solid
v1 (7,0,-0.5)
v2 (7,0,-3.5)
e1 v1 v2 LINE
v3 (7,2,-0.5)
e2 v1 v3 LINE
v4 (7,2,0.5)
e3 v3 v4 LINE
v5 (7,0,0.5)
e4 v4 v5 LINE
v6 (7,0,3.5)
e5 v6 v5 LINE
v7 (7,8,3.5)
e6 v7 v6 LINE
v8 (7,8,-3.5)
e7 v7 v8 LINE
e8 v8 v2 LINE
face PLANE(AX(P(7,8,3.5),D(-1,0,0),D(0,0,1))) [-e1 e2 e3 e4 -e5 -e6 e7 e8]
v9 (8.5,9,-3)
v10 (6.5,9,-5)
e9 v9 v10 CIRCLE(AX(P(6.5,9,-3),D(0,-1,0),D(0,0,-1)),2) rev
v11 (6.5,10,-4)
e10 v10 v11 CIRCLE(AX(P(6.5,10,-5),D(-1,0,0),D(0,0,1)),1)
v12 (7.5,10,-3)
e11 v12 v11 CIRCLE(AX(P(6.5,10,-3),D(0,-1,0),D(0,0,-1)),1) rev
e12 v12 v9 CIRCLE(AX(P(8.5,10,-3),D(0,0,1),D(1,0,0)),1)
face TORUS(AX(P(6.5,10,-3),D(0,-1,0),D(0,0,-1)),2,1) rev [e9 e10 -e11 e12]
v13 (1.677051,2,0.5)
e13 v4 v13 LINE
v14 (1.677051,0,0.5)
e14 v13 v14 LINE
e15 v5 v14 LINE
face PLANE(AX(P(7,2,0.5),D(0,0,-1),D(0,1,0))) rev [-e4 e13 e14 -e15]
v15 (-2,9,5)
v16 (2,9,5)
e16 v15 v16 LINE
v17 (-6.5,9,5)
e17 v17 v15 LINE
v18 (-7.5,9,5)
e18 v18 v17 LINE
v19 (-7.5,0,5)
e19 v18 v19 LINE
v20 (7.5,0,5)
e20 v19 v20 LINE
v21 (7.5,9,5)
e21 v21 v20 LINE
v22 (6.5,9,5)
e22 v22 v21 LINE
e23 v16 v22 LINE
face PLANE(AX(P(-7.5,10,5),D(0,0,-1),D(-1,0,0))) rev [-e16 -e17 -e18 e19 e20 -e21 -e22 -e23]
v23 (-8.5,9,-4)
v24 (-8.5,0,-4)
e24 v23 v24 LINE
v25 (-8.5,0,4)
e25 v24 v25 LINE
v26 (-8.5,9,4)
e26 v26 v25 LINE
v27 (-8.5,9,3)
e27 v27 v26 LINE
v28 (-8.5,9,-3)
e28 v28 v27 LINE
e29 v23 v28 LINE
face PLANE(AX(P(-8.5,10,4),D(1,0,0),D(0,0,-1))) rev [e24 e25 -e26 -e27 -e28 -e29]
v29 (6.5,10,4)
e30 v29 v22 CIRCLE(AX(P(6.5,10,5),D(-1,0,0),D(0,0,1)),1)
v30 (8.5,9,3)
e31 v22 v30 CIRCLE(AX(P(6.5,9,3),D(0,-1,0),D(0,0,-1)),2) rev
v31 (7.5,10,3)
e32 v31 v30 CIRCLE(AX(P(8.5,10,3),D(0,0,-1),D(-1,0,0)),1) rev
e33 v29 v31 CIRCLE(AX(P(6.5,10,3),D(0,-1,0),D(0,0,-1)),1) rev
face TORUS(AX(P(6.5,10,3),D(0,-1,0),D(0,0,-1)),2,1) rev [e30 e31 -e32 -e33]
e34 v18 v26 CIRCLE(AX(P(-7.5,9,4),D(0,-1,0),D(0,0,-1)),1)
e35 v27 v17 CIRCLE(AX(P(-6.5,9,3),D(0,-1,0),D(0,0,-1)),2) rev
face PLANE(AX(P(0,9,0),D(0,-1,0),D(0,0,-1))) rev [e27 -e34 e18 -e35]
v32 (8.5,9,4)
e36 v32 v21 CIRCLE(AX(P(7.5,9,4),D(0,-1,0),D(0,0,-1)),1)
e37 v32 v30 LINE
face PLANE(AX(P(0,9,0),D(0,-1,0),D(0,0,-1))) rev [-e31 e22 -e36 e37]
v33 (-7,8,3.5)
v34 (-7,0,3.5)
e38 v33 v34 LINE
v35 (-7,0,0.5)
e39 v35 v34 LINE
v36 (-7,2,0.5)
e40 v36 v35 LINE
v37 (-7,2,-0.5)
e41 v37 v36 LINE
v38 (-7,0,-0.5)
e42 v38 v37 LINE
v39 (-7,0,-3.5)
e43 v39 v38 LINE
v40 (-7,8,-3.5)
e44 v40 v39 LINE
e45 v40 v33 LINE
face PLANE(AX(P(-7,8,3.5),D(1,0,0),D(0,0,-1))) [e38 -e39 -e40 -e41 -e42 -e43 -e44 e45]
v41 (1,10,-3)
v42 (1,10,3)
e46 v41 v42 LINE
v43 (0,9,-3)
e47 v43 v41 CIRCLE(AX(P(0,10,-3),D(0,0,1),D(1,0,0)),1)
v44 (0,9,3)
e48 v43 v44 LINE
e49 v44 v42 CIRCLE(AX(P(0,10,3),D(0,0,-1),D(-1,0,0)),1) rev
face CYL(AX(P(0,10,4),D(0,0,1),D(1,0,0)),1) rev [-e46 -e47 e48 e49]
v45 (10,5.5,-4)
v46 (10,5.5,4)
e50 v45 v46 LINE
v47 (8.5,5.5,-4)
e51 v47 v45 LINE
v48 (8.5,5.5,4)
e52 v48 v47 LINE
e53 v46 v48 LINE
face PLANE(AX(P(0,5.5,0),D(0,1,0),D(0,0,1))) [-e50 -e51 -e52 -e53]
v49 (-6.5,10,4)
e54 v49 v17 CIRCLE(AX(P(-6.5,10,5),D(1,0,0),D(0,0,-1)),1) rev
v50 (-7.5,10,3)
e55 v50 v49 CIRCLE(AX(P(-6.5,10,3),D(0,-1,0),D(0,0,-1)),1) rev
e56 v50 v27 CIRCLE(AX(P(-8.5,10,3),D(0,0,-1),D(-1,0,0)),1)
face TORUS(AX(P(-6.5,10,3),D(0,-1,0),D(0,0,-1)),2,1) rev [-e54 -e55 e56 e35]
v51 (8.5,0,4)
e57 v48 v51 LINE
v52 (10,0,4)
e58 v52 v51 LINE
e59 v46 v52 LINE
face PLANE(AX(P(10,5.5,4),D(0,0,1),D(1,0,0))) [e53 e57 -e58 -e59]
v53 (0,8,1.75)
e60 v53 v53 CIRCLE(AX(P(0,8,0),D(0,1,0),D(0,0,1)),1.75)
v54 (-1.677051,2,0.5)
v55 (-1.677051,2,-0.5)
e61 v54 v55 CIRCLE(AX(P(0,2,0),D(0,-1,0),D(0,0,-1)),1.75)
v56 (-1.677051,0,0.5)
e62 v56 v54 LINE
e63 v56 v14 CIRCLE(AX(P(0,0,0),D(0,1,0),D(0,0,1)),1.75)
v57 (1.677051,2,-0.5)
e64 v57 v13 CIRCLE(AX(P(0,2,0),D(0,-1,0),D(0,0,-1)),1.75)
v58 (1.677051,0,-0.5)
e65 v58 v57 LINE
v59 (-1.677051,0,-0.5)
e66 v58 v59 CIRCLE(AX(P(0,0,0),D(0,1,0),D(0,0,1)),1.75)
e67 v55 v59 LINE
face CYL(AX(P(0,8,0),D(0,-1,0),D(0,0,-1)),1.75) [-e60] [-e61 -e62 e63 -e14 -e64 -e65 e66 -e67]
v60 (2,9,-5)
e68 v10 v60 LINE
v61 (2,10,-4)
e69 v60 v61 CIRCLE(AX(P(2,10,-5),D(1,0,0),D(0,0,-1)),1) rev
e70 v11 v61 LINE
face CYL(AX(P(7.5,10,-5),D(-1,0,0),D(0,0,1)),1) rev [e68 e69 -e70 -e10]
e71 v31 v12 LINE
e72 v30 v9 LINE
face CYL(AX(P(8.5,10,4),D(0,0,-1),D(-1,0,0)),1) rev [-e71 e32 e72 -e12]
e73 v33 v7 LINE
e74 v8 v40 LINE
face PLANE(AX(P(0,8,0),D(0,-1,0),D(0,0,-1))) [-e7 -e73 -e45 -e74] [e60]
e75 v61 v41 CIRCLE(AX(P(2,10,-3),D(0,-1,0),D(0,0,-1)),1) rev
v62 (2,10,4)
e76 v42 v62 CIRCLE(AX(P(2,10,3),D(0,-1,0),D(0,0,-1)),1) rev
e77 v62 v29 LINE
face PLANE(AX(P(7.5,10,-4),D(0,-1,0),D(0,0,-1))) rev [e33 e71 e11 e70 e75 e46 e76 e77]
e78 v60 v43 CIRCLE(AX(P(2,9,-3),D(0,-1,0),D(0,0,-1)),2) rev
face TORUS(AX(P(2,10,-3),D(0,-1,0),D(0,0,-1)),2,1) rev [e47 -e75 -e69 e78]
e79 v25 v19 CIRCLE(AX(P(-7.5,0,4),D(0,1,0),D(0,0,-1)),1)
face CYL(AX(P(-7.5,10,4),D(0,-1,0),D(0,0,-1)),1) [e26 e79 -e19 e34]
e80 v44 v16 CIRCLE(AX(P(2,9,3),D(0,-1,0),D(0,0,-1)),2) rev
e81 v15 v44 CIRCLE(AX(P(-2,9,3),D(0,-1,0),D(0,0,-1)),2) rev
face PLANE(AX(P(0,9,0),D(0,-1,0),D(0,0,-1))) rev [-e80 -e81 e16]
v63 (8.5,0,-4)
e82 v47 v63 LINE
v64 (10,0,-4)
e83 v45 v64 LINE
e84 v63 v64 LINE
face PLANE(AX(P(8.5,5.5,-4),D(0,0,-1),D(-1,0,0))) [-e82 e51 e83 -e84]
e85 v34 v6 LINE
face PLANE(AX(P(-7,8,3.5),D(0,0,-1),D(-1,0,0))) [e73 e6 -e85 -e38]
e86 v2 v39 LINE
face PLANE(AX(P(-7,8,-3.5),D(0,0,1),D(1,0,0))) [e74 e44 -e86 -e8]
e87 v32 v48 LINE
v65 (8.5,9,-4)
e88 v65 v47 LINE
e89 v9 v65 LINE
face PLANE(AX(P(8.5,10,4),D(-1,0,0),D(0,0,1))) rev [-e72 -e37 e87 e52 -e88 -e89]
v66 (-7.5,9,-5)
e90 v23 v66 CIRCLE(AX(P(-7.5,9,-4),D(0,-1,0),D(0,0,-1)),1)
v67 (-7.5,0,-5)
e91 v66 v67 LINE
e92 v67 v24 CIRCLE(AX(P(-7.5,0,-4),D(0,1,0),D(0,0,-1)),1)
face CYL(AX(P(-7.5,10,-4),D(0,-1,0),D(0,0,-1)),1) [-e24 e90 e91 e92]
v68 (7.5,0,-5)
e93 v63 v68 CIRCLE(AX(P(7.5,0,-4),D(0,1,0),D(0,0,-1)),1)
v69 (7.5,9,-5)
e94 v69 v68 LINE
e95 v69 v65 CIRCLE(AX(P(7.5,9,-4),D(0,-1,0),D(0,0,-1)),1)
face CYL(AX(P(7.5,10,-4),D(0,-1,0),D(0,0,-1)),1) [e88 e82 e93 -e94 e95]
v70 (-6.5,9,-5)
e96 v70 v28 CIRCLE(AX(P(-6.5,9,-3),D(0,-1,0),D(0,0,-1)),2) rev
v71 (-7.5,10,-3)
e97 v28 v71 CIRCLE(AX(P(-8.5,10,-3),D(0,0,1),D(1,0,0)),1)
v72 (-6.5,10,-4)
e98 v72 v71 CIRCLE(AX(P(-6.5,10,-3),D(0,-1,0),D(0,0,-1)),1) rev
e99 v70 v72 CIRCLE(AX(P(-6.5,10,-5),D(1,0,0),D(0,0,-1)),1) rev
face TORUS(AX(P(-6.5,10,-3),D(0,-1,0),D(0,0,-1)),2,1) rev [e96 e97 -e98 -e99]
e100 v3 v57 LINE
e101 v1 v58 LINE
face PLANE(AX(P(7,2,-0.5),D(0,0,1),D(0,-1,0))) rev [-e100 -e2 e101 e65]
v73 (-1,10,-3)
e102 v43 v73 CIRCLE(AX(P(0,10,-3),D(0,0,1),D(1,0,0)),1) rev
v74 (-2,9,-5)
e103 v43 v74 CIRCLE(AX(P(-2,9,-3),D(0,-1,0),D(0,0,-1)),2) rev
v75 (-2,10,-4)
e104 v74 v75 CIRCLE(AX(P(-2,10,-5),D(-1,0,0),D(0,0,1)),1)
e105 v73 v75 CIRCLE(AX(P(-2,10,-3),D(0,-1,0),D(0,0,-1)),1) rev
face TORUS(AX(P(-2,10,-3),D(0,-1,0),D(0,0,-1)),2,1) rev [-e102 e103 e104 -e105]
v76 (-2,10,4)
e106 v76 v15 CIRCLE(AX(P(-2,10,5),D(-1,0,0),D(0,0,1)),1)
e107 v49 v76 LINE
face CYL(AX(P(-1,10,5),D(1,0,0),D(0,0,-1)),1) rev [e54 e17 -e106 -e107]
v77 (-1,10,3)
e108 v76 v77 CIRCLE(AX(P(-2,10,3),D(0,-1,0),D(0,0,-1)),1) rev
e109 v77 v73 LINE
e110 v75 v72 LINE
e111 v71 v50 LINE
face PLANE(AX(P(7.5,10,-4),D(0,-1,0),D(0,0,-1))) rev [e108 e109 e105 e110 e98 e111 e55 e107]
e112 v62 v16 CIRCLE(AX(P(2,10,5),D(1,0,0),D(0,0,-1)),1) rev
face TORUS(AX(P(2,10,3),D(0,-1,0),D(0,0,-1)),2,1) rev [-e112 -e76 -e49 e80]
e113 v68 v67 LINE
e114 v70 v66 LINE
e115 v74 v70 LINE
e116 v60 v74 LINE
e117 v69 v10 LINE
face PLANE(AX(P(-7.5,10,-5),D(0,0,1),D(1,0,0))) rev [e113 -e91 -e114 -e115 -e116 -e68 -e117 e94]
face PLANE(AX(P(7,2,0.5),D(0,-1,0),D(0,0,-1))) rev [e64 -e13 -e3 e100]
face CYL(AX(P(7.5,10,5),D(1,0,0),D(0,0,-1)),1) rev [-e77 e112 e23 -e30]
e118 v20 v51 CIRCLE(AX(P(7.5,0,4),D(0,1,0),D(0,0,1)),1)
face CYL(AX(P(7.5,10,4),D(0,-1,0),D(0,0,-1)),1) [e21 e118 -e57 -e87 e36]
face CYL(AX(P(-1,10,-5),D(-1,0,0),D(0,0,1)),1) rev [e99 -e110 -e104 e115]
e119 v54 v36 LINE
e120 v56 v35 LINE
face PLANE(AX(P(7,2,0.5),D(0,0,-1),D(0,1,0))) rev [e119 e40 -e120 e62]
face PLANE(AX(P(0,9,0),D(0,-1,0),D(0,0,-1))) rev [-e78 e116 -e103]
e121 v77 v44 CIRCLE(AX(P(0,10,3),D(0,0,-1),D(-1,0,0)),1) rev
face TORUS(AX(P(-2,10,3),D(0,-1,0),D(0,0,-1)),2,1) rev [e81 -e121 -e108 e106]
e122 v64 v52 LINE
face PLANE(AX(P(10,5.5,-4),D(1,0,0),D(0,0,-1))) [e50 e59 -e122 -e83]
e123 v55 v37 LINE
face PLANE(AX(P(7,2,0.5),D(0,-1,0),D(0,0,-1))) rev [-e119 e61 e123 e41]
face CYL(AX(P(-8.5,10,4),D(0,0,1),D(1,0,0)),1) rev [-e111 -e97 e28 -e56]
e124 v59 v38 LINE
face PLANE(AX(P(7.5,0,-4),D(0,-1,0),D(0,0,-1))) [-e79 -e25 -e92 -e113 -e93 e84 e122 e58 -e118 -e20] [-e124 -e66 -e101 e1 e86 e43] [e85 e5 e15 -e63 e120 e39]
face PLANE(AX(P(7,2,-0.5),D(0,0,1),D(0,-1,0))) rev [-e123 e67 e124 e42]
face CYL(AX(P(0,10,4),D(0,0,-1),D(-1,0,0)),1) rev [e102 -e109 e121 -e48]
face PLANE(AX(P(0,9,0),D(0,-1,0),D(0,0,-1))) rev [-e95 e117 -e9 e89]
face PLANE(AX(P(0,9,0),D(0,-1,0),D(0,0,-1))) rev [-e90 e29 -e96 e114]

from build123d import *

# Parameters (mm, degrees)
BOSS_EXTRUDE1_DEPTH = 10
SKETCH2_W           = 14
SKETCH2_H           = 7
SKETCH2_R           = 1.75
CUT_EXTRUDE1_DEPTH  = 8
SKETCH3_W           = 1
SKETCH3_H           = 2
BOSS_EXTRUDE2_DEPTH = 14
SKETCH4_W           = 1.5
SKETCH4_H           = 8
BOSS_EXTRUDE3_DEPTH = 5.5
SKETCH5_W           = 17
SKETCH5_H           = 10
SKETCH5_W_2         = 6.5
SKETCH5_H_2         = 8
CUT_EXTRUDE2_DEPTH  = 1
FILLET2_R           = 1


with BuildPart() as part:
    # Sketch1 → Boss-Extrude1 (new body)
    with BuildSketch(Plane(origin=(0, 0, 0), x_dir=(1, 0, 0), z_dir=(0, 1, 0))):
        with BuildLine():
            Line((-7.5, -5), (7.5, -5))
            ThreePointArc((7.5, -5), (8.207106781, -4.707106781), (8.5, -4))
            Line((8.5, -4), (8.5, 4))
            ThreePointArc((8.5, 4), (8.207106781, 4.707106781), (7.5, 5))
            Line((7.5, 5), (-7.5, 5))
            ThreePointArc((-7.5, 5), (-8.207106781, 4.707106781), (-8.5, 4))
            Line((-8.5, 4), (-8.5, -4))
            ThreePointArc((-8.5, -4), (-8.207106781, -4.707106781), (-7.5, -5))
        make_face()
    extrude(amount=BOSS_EXTRUDE1_DEPTH)

    # Sketch2 → Cut-Extrude1 (cut)
    with BuildSketch(Plane(origin=(0, 0, 0), x_dir=(1, 0, 0), z_dir=(0, 1, 0))):
        Rectangle(SKETCH2_W, SKETCH2_H)
        with Locations(Location((0, 0, 0), (0, 0, 270))):
            Circle(SKETCH2_R, mode=Mode.SUBTRACT)
    extrude(amount=CUT_EXTRUDE1_DEPTH, mode=Mode.SUBTRACT)

    # Sketch3 → Boss-Extrude2 (add)
    with BuildSketch(Plane(origin=(-7, 0, 0), x_dir=(0, 0, -1), z_dir=(1, 0, 0))):
        with Locations((0, 1)):
            Rectangle(SKETCH3_W, SKETCH3_H)
    extrude(amount=BOSS_EXTRUDE2_DEPTH)

    # Sketch4 → Boss-Extrude3 (add)
    with BuildSketch(Plane.XZ):
        with Locations((9.25, 0)):
            Rectangle(SKETCH4_W, SKETCH4_H)
    extrude(amount=-BOSS_EXTRUDE3_DEPTH)

    # Sketch5 → Cut-Extrude2 (cut)
    with BuildSketch(Plane(origin=(0, 10, 0), x_dir=(1, 0, 0), z_dir=(0, 1, 0))):
        Rectangle(SKETCH5_W, SKETCH5_H)
        with Locations((-4.25, 0)):
            Rectangle(SKETCH5_W_2, SKETCH5_H_2, mode=Mode.SUBTRACT)
        with Locations((4.25, 0)):
            Rectangle(SKETCH5_W_2, SKETCH5_H_2, mode=Mode.SUBTRACT)
    extrude(amount=-CUT_EXTRUDE2_DEPTH, mode=Mode.SUBTRACT)

    # Fillet2
    fillet2_edges = [part.edges().sort_by_distance(p)[0] for p in [
        (-7.5, 9.5, -4),
        (-1, 9.5, -4),
        (-1, 9.5, 4),
        (-7.5, 9.5, 4),
        (1, 9.5, -4),
        (7.5, 9.5, -4),
        (7.5, 9.5, 4),
        (1, 9.5, 4),
        (1, 9, 0),
        (4.25, 9, 4),
        (7.5, 9, 0),
        (4.25, 9, -4),
        (-7.5, 9, 0),
        (-4.25, 9, 4),
        (-1, 9, 0),
        (-4.25, 9, -4),
    ]]
    fillet(fillet2_edges, radius=FILLET2_R - 0.0001)  # a hair under: the kernel refuses the full size


solid = part.part
